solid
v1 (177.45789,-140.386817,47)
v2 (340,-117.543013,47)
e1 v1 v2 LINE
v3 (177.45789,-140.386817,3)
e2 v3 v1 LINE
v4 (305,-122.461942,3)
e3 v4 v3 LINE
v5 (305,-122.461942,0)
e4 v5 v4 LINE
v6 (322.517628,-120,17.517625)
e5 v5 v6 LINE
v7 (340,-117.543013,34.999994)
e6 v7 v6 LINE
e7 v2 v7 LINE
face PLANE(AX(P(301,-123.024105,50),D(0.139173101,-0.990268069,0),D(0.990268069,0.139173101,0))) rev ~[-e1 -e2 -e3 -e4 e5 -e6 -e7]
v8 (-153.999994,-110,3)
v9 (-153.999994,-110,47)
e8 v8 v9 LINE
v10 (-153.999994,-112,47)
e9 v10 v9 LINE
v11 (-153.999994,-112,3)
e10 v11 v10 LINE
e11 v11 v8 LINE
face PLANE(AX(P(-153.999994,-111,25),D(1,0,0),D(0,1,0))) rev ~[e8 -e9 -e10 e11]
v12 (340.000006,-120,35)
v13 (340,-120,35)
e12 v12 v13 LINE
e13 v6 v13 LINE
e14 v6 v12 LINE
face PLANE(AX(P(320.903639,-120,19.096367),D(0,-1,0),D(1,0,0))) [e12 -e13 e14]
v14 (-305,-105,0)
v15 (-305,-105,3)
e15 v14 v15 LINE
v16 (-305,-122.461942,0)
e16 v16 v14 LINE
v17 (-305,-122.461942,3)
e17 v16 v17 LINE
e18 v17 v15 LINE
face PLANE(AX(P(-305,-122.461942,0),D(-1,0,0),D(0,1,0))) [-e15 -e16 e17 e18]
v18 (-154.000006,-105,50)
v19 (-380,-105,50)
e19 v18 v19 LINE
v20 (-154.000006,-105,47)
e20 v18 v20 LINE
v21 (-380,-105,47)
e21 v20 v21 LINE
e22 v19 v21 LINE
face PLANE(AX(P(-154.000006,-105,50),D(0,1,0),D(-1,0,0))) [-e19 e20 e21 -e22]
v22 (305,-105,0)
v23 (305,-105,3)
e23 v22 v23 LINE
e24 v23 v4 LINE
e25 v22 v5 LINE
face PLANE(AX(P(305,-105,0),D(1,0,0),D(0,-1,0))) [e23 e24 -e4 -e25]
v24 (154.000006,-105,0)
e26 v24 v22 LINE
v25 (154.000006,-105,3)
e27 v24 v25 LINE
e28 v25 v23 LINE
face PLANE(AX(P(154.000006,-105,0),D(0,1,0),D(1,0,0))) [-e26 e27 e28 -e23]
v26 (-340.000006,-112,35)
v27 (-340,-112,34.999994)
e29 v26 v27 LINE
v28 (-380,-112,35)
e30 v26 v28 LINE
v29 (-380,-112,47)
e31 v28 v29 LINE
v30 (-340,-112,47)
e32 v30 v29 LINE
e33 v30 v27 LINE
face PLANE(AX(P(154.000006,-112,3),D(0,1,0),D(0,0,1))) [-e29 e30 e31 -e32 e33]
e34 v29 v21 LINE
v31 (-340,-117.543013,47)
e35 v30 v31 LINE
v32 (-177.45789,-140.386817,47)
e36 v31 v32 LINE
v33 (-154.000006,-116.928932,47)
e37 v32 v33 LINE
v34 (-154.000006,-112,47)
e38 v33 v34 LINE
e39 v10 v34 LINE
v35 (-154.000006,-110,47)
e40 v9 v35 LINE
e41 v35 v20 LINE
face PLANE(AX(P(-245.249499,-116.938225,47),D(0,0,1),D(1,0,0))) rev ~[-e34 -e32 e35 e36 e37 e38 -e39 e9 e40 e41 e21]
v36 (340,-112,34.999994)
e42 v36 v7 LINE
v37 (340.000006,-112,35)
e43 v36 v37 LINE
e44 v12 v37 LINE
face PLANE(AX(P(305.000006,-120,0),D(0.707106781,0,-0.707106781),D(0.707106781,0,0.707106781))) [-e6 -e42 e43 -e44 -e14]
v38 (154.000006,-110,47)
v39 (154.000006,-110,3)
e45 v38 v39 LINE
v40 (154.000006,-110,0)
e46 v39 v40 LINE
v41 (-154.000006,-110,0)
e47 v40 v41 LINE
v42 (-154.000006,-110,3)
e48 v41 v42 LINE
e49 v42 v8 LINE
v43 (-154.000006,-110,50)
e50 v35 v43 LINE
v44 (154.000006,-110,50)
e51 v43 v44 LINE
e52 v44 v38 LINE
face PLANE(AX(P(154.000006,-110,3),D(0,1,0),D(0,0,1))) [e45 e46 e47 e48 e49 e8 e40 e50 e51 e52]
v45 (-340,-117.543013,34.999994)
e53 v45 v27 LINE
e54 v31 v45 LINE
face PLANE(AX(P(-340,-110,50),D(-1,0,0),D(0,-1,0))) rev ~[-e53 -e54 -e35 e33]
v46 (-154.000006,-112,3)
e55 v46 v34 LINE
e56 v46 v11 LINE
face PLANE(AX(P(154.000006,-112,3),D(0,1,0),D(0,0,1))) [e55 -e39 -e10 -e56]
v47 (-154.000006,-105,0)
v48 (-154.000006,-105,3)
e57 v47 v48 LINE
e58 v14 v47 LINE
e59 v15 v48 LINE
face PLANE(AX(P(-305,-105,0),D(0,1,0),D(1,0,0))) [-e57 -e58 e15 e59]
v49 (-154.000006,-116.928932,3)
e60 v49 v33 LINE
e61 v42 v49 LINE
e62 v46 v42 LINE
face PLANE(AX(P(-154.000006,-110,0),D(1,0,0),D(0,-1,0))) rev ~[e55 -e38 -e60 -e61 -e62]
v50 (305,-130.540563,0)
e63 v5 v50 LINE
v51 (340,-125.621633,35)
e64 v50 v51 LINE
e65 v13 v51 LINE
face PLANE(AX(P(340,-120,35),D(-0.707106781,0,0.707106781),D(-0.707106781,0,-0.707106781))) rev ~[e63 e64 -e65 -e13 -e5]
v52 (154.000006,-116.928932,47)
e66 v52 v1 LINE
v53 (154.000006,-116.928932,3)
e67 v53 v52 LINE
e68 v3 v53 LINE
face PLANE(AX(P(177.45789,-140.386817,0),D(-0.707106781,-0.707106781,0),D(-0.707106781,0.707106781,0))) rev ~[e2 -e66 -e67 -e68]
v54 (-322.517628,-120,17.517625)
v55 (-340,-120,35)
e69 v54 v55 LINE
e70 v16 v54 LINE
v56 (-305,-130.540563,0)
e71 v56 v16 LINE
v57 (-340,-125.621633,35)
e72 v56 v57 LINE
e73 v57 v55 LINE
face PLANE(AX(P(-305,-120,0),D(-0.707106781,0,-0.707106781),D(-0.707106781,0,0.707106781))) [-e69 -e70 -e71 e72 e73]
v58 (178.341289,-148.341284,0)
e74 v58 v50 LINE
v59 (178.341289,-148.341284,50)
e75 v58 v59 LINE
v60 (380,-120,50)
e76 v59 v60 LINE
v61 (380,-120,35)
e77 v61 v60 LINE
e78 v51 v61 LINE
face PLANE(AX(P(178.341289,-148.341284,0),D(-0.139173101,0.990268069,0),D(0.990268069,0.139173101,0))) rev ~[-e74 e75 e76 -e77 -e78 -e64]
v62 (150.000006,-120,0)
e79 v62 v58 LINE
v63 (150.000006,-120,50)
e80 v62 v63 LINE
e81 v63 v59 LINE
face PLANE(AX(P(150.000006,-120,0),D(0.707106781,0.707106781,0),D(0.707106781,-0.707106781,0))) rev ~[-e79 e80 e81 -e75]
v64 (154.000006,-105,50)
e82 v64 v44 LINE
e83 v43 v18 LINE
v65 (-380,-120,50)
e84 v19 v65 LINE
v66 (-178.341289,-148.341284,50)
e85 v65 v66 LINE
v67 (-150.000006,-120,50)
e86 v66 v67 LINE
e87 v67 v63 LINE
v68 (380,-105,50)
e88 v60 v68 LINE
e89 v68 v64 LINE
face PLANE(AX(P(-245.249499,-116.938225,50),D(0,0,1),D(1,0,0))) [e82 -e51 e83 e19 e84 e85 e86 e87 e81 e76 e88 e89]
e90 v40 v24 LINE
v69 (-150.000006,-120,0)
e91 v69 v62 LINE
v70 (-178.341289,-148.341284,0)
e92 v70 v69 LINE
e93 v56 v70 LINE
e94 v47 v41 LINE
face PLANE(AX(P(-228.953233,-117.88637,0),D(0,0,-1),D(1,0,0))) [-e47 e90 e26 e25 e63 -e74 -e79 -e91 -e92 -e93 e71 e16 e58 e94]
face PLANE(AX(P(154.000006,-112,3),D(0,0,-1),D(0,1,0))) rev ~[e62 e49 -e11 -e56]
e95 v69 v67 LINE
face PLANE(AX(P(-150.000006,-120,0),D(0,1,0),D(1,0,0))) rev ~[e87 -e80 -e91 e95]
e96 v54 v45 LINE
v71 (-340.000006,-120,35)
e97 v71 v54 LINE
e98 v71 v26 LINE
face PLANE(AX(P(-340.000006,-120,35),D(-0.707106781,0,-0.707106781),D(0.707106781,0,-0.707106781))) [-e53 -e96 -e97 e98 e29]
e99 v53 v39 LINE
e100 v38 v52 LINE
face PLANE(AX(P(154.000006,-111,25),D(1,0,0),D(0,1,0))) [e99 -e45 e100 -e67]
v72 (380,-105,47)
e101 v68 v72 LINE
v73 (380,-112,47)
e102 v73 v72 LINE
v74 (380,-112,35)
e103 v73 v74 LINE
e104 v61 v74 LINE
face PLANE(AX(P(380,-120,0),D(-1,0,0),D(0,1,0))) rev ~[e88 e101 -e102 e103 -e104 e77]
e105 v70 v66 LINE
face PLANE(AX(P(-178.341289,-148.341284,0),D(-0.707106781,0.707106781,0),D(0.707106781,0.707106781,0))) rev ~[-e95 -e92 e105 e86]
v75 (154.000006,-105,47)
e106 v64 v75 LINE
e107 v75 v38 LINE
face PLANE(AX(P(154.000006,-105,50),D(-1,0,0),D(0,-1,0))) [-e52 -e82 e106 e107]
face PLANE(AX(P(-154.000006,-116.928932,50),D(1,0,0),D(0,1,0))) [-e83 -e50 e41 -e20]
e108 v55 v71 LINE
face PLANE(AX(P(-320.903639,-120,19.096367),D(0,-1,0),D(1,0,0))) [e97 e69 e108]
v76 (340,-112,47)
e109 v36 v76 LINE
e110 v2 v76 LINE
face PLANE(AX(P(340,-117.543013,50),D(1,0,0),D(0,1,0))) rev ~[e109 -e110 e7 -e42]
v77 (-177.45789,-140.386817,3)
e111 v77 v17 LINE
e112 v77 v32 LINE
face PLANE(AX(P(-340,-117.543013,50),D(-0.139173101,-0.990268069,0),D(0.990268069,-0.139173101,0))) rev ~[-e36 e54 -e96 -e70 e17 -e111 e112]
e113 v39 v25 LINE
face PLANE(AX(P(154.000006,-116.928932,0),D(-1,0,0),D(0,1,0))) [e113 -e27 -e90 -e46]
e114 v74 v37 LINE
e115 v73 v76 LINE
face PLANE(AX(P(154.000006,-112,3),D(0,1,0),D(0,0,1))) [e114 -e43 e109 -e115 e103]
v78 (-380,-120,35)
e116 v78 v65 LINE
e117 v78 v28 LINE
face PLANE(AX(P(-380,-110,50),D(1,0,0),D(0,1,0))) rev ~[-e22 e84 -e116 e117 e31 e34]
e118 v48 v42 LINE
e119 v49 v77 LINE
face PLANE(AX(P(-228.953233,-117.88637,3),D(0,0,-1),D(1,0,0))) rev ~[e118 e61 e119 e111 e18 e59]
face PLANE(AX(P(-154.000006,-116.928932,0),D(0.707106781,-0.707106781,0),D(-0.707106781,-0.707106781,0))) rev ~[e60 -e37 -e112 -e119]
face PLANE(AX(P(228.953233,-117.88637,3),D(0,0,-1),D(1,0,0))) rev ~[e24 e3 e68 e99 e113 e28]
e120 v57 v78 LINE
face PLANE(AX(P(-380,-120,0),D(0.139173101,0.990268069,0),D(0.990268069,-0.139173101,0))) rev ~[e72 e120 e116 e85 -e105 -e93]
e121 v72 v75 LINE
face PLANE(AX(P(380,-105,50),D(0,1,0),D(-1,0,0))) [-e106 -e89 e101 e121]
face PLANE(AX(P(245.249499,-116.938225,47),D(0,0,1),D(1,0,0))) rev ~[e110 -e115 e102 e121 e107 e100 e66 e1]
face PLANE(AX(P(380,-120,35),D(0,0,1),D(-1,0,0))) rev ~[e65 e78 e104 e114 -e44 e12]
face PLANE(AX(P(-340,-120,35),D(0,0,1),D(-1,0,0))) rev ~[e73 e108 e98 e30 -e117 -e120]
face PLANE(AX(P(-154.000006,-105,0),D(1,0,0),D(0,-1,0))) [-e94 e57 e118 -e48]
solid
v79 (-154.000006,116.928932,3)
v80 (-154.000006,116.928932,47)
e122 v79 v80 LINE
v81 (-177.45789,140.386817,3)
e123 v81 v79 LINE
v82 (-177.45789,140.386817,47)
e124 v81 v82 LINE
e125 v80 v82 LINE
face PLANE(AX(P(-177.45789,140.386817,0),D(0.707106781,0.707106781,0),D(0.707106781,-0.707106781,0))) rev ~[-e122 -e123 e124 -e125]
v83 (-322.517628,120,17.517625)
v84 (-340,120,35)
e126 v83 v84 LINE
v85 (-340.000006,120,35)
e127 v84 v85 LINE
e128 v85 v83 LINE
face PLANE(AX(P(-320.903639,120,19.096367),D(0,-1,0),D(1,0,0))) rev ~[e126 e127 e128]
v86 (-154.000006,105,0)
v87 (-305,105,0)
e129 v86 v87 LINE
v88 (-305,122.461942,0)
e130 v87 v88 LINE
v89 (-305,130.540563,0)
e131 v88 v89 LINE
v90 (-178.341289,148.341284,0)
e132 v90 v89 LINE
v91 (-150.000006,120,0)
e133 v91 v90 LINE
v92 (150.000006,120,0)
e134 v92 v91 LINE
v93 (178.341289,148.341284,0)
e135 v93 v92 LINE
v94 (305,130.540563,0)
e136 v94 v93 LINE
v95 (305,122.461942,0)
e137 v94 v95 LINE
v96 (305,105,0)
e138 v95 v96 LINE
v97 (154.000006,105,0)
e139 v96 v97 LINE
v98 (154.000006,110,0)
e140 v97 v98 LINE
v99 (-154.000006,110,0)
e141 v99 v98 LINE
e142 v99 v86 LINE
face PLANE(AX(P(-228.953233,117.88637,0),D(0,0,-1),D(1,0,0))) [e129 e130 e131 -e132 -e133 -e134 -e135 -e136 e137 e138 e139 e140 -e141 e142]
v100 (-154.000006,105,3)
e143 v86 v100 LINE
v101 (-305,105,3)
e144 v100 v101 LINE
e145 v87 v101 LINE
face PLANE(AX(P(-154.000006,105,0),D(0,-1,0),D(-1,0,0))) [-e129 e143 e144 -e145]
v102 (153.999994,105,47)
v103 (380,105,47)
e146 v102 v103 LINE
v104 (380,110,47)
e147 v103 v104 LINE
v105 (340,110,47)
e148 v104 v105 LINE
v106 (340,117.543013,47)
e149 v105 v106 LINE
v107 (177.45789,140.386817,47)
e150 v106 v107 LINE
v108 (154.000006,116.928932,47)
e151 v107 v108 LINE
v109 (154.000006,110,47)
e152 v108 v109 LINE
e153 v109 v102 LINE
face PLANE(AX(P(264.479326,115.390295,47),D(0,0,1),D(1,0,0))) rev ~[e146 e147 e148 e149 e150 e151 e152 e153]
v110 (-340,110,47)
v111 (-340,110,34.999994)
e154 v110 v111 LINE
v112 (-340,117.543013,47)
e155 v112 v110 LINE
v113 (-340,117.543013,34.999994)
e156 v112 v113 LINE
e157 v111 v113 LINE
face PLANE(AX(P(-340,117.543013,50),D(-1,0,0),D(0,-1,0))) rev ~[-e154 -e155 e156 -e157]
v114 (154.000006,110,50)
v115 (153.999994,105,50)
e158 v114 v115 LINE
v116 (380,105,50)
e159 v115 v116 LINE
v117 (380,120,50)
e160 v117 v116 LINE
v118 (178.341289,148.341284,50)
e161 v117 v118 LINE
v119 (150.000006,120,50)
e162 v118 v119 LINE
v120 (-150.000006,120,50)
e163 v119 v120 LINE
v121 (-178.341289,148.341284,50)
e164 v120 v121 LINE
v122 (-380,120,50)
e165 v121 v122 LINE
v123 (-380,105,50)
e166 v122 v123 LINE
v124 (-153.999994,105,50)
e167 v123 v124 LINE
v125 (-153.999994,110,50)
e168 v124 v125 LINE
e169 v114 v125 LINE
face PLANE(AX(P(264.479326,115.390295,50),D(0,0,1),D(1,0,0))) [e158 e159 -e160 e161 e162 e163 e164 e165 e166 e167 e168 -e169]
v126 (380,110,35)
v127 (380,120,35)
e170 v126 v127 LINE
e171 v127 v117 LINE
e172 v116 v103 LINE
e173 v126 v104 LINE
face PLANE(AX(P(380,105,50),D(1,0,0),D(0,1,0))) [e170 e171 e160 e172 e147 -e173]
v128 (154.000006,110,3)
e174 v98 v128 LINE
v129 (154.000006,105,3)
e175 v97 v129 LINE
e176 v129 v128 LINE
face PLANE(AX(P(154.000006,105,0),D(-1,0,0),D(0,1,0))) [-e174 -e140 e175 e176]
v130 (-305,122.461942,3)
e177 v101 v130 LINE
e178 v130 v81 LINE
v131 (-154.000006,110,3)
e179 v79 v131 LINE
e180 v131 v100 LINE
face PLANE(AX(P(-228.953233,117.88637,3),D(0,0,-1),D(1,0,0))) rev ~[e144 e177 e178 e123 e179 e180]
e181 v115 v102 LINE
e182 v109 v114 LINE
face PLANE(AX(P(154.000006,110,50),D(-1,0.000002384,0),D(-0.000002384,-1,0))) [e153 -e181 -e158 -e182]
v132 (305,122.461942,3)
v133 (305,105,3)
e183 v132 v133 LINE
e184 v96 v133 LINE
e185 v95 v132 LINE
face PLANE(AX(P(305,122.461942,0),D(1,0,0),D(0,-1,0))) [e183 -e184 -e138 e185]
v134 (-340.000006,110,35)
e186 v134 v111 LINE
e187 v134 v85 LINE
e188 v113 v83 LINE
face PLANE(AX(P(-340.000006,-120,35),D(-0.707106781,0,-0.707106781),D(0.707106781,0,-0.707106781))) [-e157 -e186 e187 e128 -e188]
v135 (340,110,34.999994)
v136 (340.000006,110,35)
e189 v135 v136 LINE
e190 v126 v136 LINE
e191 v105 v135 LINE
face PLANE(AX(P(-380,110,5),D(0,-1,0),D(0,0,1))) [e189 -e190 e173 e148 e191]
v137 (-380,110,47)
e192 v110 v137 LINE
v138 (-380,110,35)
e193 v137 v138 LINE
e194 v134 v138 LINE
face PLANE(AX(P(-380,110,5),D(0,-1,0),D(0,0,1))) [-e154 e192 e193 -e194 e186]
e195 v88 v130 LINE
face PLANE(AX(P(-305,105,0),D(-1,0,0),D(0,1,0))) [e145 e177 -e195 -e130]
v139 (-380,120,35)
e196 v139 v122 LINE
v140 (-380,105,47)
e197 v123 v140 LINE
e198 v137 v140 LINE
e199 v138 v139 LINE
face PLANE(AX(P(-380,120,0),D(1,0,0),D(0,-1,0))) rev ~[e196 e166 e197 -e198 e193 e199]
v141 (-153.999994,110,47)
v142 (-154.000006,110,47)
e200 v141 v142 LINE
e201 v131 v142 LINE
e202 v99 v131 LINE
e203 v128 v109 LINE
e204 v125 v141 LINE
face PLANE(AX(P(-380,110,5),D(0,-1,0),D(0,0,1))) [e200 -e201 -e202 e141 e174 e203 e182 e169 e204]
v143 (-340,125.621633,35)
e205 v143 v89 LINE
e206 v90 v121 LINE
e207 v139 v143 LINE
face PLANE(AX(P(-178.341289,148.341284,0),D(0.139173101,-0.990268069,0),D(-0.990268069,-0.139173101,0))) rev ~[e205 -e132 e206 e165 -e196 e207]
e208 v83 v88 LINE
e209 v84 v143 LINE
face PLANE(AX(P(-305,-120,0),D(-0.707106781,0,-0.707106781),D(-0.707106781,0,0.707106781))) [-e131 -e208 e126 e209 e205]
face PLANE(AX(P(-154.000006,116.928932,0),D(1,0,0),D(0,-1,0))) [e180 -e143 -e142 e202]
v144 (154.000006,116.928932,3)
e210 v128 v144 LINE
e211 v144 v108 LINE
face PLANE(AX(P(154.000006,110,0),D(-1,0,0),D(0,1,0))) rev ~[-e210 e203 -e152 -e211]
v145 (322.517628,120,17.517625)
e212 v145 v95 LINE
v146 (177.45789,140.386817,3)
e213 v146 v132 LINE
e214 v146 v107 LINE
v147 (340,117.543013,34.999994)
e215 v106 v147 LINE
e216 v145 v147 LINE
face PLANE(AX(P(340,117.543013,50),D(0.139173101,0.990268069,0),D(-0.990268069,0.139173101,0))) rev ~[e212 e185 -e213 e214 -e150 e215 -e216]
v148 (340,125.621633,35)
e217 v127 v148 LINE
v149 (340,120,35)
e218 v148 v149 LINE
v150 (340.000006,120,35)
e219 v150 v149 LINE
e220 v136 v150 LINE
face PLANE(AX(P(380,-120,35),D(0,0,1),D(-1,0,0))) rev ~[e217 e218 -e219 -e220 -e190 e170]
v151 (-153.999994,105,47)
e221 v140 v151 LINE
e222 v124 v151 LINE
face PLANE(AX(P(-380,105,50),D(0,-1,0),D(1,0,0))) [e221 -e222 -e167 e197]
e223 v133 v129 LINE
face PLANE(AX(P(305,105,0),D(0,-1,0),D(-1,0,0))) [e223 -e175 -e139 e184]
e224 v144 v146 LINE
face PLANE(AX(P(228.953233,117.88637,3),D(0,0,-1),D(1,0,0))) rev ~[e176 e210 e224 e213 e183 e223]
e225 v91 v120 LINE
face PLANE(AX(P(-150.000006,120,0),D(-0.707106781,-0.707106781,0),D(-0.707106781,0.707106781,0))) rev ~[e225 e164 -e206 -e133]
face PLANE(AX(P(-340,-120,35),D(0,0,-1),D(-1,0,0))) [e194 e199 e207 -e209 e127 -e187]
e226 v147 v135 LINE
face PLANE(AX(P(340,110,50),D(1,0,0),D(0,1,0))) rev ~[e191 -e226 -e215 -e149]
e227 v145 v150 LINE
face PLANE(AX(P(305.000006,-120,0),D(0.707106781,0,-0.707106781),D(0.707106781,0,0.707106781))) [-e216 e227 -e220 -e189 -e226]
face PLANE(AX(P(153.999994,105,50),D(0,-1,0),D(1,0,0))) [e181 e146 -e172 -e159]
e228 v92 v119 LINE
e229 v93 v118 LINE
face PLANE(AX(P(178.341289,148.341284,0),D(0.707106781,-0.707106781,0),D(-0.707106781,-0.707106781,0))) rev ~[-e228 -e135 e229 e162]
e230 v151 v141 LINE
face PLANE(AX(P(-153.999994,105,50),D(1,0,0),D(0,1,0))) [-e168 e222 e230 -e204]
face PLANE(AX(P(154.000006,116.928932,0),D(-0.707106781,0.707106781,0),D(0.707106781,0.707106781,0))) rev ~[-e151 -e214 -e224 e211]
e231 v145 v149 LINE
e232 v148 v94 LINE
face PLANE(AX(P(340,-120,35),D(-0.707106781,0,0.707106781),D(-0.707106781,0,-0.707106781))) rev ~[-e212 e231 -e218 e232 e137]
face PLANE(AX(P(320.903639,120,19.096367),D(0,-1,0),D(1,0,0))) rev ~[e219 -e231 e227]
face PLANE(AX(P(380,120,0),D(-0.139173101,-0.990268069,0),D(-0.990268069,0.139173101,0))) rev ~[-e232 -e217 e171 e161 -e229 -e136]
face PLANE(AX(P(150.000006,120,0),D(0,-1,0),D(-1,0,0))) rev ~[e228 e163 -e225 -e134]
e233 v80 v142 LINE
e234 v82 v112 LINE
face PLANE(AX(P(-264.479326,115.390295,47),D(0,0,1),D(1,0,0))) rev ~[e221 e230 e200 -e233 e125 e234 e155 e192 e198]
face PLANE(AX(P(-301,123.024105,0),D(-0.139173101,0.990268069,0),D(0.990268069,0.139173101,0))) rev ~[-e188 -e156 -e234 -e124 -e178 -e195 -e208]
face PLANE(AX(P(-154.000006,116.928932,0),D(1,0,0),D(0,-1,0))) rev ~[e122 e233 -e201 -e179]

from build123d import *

# Parameters (mm, degrees)
F1_DEPTH  = 50
F3_W      = 220
F3_H      = 40
F4_DEPTH  = 760
F5_DEPTH  = 240
F6_W      = 319.9999928474
F6_H      = 220
F6_W_2    = 280
F6_H_2    = 180
F7_DEPTH  = 50
F8_DEPTH  = 435.9292732552
F9_W      = 140
F9_H      = 220
F10_DEPTH = 10
F12_DEPTH = 240
F13_DEPTH = 25
F14_DEPTH = 25
F16_W     = 220
F16_H     = 40
F17_DEPTH = 5
F15_W     = 220
F15_H     = 40
F18_DEPTH = 5
F20_DEPTH = 121.5992048383
F21_DEPTH = 1432.7406287193
F22_DEPTH = 794.6060718969
F23_DEPTH = 848.3018605039
F25_DEPTH = 50
F26_DEPTH = 50
F28_DEPTH = 50
F29_W     = 2
F29_H     = 43.9999995766
F30_DEPTH = 777.0212888718
F31_DEPTH = 308
F32_W     = 40
F32_H     = 5
F33_DEPTH = 3
F35_DEPTH = 3


# Not quite as in the source:
# - ends of sketch curves that miss each other by under 0.0002 mm in the source are joined
# - a feature names something its author has since deleted; it is built from what else it names


with BuildPart() as f1:
    # F0 (on Top) → F1 (new body)
    with BuildSketch(Plane.XY):
        Polygon((-178.3412894642, 148.3412835037), (-380, 120), (-380, -120), (-178.3412894642, -148.3412835037), (-150.0000059605, -120), (150.0000059605, -120), (178.3412894642, -148.3412835037), (380, -120), (380, 120), (178.3412894642, 148.3412835037), (150.0000059605, 120), (-150.0000059605, 120), align=None)
    extrude(amount=F1_DEPTH)

    # F3 (on face) → F4 (cut)
    with BuildSketch(Plane(origin=(-380, 0, 0), x_dir=(0, -1, 0), z_dir=(-1, 0, 0))):
        with Locations((0, 25)):
            Rectangle(F3_W, F3_H)
    extrude(amount=-F4_DEPTH, mode=Mode.SUBTRACT)

    # F2 (on face) → F5 (cut)
    with BuildSketch(Plane.XZ.offset(120)):
        Polygon((305, 0), (380, 0), (380, 35), (340, 35), align=None)
        Polygon((-340, 35), (-380, 35), (-380, 0), (-305, 0), align=None)
    extrude(amount=-F5_DEPTH, mode=Mode.SUBTRACT)

    # F6 (on face) → F7 (cut)
    with BuildSketch(Plane.XY.offset(50)):
        Rectangle(F6_W, F6_H)
        Rectangle(F6_W_2, F6_H_2, mode=Mode.SUBTRACT)
    extrude(amount=-F7_DEPTH, mode=Mode.SUBTRACT)

    # F2 (on face) → F8 (cut, symmetric)
    with BuildSketch(Plane.XZ.offset(120)):
        Polygon((-340, 35), (-380, 35), (-380, 0), (-305, 0), align=None)
        Polygon((305, 0), (380, 0), (380, 35), (340, 35), align=None)
    extrude(amount=F8_DEPTH, both=True, mode=Mode.SUBTRACT)

    # F9 (on face) → F10 (cut)
    with BuildSketch(Plane.XY.offset(50)):
        with Locations((-234.9999964237, 0)):
            Rectangle(F9_W, F9_H)
        with Locations((234.9999964237, 0)):
            Rectangle(F9_W, F9_H)
    extrude(amount=-F10_DEPTH, mode=Mode.SUBTRACT)

    # F13 (cut): a face of the model
    f13_faces = [f1.faces().sort_by_distance(p)[0] for p in [
        (0, 0, 50),
    ]]
    extrude(f13_faces, amount=-F13_DEPTH, mode=Mode.SUBTRACT)

    # F14 (cut): a face of the model
    f14_faces = [f1.faces().sort_by_distance(p)[0] for p in [
        (0, 0, 0),
    ]]
    extrude(f14_faces, amount=-F14_DEPTH, mode=Mode.SUBTRACT)

    # F16 (on face) → F17 (join)
    with BuildSketch(Plane.YZ.offset(-159.9999964237)):
        with Locations((0, 25)):
            Rectangle(F16_W, F16_H)
    extrude(amount=-F17_DEPTH)

    # F15 (on face) → F18 (join)
    with BuildSketch(Plane(origin=(159.9999964237, 0, 0), x_dir=(0, -1, 0), z_dir=(-1, 0, 0))):
        with Locations((0, 25)):
            Rectangle(F15_W, F15_H)
    extrude(amount=-F18_DEPTH)


with BuildPart() as f12:
    # F11 (on face) → F12 (new body)
    with BuildSketch(Plane.XZ.offset(120)):
        Polygon((-305.0000059605, 0), (-305.0000059605, 7.0710678119), (-332.9289381486, 35), (-340.0000059605, 35), align=None)
    extrude(amount=-F12_DEPTH)


with BuildPart() as f12b:
    # F11 (on face) → F12, piece 2 (new body)
    with BuildSketch(Plane.XZ.offset(120)):
        Polygon((340.0000059605, 35), (332.9289381486, 35), (305.0000059605, 7.0710678119), (305.0000059605, 0), align=None)
    extrude(amount=-F12_DEPTH)


with BuildPart() as f1_1:
    add(f1.part)

    # F19: union F12, F12b
    add(f12.part)
    add(f12b.part)

    # F20 (cut): a face of the model
    f20_faces = [f1_1.faces().sort_by_distance(p)[0] for p in [
        (-304.9999964237, 0, 47.5),
    ]]
    extrude(f20_faces, amount=-F20_DEPTH, mode=Mode.SUBTRACT)

    # F21 (cut, symmetric): a face of the model
    f21_faces = [f1_1.faces().sort_by_distance(p)[0] for p in [
        (304.9999964237, 0, 47.5),
    ]]
    extrude(f21_faces, amount=F21_DEPTH, both=True, mode=Mode.SUBTRACT)

    # F22 (cut, symmetric): a face of the model
    f22_faces = [f1_1.faces().sort_by_distance(p)[0] for p in [
        (-164.9999964237, 0, 25),
    ]]
    extrude(f22_faces, amount=F22_DEPTH, both=True, mode=Mode.SUBTRACT)

    # F23 (cut, symmetric): a face of the model
    f23_faces = [f1_1.faces().sort_by_distance(p)[0] for p in [
        (-159.9999964237, 0, 2.5),
    ]]
    extrude(f23_faces, amount=F23_DEPTH, both=True, mode=Mode.SUBTRACT)

    # F24 (on face) → F25 (cut)
    with BuildSketch(Plane(origin=(0, 0, 0), x_dir=(1, 0, 0), z_dir=(0, 0, -1))):
        Polygon((-154.0000059605, -110), (-301, -110), (-301, -123.0241053613), (-177.4578903454, -140.3868165731), (-154.0000059605, -116.9289321881), align=None)
        Polygon((301, -123.0241053613), (301, -110), (154.0000059605, -110), (154.0000059605, -116.9289321881), (177.4578903454, -140.3868165731), align=None)
    extrude(amount=-F25_DEPTH, mode=Mode.SUBTRACT)

    # F24 (on face) → F26 (cut)
    with BuildSketch(Plane(origin=(0, 0, 0), x_dir=(1, 0, 0), z_dir=(0, 0, -1))):
        Polygon((-301, 123.0241053613), (-301, 110), (-154.0000059605, 110), (-154.0000059605, 116.9289321881), (-177.4578903454, 140.3868165731), align=None)
        Polygon((154.0000059605, 116.9289321881), (154.0000059605, 110), (301, 110), (301, 123.0241053613), (177.4578903454, 140.3868165731), align=None)
    extrude(amount=-F26_DEPTH, mode=Mode.SUBTRACT)

    # F27 (on face) → F28 (cut)
    with BuildSketch(Plane.XY.offset(50)):
        Polygon((301, -110), (301, -123.0241053613), (340, -117.5430128079), (340, -110), align=None)
        Polygon((-301, -123.0241053613), (-301, -110), (-340, -110), (-340, -117.5430128079), align=None)
        Polygon((301, 110), (340, 110), (340, 117.5430128079), (301, 123.0241053613), align=None)
        Polygon((-340, 110), (-301, 110), (-301, 123.0241053613), (-340, 117.5430128079), align=None)
    extrude(amount=-F28_DEPTH, mode=Mode.SUBTRACT)

    # F29 (on face) → F30 (cut, symmetric)
    with BuildSketch(Plane.YZ.offset(154.0000059605)):
        with Locations((-111, 25.0000002117)):
            Rectangle(F29_W, F29_H)
    extrude(amount=F30_DEPTH, both=True, mode=Mode.SUBTRACT)

    # F29 (on face) → F31 (join)
    with BuildSketch(Plane.YZ.offset(154.0000059605)):
        with Locations((-111, 25.0000002117)):
            Rectangle(F29_W, F29_H)
    extrude(amount=-F31_DEPTH)

    # F32 (on face) → F33 (join)
    with BuildSketch(Plane.XY.offset(50)):
        Polygon((380, 105), (380, 110), (340, 110), (340, 117.5430128079), (177.4578903454, 140.3868165731), (154.0000059605, 116.9289321881), (154.0000059605, 110), (153.9999940395, 105), (340, 105), align=None)
        Polygon((-340, 117.5430128079), (-340, 110), (-380, 110), (-380, 105), (-340, 105), (-153.9999940395, 105), (-153.9999940395, 110), (-154.0000059605, 116.9289321881), (-177.4578903454, 140.3868165731), align=None)
        Polygon((-154.0000059605, -116.9289321881), (-154.0000059605, -110), (-154.0000059605, -105), (-340, -105), (-340, -110), (-340, -117.5430128079), (-177.4578903454, -140.3868165731), align=None)
        with Locations((-360, -107.5)):
            Rectangle(F32_W, F32_H)
        Polygon((340, -105), (154.0000059605, -105), (154.0000059605, -110), (154.0000059605, -116.9289321881), (177.4578903454, -140.3868165731), (340, -117.5430128079), (340, -110), align=None)
        with Locations((360, -107.5)):
            Rectangle(F32_W, F32_H)
    extrude(amount=-F33_DEPTH)

    # F34 (on face) → F35 (join)
    with BuildSketch(Plane(origin=(0, 0, 0), x_dir=(1, 0, 0), z_dir=(0, 0, -1))):
        Polygon((-154.0000059605, -116.9289321881), (-154.0000059605, -110), (-154.0000059605, -105), (-305, -105), (-305, -110), (-305, -122.4619420225), (-177.4578903454, -140.3868165731), align=None)
        Polygon((-305, 105), (-154.0000059605, 105), (-154.0000059605, 110), (-154.0000059605, 116.9289321881), (-177.4578903454, 140.3868165731), (-305, 122.4619420225), (-305, 110), align=None)
        Polygon((305, -105), (154.0000059605, -105), (154.0000059605, -110), (154.0000059605, -116.9289321881), (177.4578903454, -140.3868165731), (305, -122.4619420225), (305, -110), align=None)
        Polygon((154.0000059605, 110), (154.0000059605, 105), (305, 105), (305, 110), (305, 122.4619420225), (177.4578903454, 140.3868165731), (154.0000059605, 116.9289321881), align=None)
    extrude(amount=-F35_DEPTH)


solid = f1_1.part
